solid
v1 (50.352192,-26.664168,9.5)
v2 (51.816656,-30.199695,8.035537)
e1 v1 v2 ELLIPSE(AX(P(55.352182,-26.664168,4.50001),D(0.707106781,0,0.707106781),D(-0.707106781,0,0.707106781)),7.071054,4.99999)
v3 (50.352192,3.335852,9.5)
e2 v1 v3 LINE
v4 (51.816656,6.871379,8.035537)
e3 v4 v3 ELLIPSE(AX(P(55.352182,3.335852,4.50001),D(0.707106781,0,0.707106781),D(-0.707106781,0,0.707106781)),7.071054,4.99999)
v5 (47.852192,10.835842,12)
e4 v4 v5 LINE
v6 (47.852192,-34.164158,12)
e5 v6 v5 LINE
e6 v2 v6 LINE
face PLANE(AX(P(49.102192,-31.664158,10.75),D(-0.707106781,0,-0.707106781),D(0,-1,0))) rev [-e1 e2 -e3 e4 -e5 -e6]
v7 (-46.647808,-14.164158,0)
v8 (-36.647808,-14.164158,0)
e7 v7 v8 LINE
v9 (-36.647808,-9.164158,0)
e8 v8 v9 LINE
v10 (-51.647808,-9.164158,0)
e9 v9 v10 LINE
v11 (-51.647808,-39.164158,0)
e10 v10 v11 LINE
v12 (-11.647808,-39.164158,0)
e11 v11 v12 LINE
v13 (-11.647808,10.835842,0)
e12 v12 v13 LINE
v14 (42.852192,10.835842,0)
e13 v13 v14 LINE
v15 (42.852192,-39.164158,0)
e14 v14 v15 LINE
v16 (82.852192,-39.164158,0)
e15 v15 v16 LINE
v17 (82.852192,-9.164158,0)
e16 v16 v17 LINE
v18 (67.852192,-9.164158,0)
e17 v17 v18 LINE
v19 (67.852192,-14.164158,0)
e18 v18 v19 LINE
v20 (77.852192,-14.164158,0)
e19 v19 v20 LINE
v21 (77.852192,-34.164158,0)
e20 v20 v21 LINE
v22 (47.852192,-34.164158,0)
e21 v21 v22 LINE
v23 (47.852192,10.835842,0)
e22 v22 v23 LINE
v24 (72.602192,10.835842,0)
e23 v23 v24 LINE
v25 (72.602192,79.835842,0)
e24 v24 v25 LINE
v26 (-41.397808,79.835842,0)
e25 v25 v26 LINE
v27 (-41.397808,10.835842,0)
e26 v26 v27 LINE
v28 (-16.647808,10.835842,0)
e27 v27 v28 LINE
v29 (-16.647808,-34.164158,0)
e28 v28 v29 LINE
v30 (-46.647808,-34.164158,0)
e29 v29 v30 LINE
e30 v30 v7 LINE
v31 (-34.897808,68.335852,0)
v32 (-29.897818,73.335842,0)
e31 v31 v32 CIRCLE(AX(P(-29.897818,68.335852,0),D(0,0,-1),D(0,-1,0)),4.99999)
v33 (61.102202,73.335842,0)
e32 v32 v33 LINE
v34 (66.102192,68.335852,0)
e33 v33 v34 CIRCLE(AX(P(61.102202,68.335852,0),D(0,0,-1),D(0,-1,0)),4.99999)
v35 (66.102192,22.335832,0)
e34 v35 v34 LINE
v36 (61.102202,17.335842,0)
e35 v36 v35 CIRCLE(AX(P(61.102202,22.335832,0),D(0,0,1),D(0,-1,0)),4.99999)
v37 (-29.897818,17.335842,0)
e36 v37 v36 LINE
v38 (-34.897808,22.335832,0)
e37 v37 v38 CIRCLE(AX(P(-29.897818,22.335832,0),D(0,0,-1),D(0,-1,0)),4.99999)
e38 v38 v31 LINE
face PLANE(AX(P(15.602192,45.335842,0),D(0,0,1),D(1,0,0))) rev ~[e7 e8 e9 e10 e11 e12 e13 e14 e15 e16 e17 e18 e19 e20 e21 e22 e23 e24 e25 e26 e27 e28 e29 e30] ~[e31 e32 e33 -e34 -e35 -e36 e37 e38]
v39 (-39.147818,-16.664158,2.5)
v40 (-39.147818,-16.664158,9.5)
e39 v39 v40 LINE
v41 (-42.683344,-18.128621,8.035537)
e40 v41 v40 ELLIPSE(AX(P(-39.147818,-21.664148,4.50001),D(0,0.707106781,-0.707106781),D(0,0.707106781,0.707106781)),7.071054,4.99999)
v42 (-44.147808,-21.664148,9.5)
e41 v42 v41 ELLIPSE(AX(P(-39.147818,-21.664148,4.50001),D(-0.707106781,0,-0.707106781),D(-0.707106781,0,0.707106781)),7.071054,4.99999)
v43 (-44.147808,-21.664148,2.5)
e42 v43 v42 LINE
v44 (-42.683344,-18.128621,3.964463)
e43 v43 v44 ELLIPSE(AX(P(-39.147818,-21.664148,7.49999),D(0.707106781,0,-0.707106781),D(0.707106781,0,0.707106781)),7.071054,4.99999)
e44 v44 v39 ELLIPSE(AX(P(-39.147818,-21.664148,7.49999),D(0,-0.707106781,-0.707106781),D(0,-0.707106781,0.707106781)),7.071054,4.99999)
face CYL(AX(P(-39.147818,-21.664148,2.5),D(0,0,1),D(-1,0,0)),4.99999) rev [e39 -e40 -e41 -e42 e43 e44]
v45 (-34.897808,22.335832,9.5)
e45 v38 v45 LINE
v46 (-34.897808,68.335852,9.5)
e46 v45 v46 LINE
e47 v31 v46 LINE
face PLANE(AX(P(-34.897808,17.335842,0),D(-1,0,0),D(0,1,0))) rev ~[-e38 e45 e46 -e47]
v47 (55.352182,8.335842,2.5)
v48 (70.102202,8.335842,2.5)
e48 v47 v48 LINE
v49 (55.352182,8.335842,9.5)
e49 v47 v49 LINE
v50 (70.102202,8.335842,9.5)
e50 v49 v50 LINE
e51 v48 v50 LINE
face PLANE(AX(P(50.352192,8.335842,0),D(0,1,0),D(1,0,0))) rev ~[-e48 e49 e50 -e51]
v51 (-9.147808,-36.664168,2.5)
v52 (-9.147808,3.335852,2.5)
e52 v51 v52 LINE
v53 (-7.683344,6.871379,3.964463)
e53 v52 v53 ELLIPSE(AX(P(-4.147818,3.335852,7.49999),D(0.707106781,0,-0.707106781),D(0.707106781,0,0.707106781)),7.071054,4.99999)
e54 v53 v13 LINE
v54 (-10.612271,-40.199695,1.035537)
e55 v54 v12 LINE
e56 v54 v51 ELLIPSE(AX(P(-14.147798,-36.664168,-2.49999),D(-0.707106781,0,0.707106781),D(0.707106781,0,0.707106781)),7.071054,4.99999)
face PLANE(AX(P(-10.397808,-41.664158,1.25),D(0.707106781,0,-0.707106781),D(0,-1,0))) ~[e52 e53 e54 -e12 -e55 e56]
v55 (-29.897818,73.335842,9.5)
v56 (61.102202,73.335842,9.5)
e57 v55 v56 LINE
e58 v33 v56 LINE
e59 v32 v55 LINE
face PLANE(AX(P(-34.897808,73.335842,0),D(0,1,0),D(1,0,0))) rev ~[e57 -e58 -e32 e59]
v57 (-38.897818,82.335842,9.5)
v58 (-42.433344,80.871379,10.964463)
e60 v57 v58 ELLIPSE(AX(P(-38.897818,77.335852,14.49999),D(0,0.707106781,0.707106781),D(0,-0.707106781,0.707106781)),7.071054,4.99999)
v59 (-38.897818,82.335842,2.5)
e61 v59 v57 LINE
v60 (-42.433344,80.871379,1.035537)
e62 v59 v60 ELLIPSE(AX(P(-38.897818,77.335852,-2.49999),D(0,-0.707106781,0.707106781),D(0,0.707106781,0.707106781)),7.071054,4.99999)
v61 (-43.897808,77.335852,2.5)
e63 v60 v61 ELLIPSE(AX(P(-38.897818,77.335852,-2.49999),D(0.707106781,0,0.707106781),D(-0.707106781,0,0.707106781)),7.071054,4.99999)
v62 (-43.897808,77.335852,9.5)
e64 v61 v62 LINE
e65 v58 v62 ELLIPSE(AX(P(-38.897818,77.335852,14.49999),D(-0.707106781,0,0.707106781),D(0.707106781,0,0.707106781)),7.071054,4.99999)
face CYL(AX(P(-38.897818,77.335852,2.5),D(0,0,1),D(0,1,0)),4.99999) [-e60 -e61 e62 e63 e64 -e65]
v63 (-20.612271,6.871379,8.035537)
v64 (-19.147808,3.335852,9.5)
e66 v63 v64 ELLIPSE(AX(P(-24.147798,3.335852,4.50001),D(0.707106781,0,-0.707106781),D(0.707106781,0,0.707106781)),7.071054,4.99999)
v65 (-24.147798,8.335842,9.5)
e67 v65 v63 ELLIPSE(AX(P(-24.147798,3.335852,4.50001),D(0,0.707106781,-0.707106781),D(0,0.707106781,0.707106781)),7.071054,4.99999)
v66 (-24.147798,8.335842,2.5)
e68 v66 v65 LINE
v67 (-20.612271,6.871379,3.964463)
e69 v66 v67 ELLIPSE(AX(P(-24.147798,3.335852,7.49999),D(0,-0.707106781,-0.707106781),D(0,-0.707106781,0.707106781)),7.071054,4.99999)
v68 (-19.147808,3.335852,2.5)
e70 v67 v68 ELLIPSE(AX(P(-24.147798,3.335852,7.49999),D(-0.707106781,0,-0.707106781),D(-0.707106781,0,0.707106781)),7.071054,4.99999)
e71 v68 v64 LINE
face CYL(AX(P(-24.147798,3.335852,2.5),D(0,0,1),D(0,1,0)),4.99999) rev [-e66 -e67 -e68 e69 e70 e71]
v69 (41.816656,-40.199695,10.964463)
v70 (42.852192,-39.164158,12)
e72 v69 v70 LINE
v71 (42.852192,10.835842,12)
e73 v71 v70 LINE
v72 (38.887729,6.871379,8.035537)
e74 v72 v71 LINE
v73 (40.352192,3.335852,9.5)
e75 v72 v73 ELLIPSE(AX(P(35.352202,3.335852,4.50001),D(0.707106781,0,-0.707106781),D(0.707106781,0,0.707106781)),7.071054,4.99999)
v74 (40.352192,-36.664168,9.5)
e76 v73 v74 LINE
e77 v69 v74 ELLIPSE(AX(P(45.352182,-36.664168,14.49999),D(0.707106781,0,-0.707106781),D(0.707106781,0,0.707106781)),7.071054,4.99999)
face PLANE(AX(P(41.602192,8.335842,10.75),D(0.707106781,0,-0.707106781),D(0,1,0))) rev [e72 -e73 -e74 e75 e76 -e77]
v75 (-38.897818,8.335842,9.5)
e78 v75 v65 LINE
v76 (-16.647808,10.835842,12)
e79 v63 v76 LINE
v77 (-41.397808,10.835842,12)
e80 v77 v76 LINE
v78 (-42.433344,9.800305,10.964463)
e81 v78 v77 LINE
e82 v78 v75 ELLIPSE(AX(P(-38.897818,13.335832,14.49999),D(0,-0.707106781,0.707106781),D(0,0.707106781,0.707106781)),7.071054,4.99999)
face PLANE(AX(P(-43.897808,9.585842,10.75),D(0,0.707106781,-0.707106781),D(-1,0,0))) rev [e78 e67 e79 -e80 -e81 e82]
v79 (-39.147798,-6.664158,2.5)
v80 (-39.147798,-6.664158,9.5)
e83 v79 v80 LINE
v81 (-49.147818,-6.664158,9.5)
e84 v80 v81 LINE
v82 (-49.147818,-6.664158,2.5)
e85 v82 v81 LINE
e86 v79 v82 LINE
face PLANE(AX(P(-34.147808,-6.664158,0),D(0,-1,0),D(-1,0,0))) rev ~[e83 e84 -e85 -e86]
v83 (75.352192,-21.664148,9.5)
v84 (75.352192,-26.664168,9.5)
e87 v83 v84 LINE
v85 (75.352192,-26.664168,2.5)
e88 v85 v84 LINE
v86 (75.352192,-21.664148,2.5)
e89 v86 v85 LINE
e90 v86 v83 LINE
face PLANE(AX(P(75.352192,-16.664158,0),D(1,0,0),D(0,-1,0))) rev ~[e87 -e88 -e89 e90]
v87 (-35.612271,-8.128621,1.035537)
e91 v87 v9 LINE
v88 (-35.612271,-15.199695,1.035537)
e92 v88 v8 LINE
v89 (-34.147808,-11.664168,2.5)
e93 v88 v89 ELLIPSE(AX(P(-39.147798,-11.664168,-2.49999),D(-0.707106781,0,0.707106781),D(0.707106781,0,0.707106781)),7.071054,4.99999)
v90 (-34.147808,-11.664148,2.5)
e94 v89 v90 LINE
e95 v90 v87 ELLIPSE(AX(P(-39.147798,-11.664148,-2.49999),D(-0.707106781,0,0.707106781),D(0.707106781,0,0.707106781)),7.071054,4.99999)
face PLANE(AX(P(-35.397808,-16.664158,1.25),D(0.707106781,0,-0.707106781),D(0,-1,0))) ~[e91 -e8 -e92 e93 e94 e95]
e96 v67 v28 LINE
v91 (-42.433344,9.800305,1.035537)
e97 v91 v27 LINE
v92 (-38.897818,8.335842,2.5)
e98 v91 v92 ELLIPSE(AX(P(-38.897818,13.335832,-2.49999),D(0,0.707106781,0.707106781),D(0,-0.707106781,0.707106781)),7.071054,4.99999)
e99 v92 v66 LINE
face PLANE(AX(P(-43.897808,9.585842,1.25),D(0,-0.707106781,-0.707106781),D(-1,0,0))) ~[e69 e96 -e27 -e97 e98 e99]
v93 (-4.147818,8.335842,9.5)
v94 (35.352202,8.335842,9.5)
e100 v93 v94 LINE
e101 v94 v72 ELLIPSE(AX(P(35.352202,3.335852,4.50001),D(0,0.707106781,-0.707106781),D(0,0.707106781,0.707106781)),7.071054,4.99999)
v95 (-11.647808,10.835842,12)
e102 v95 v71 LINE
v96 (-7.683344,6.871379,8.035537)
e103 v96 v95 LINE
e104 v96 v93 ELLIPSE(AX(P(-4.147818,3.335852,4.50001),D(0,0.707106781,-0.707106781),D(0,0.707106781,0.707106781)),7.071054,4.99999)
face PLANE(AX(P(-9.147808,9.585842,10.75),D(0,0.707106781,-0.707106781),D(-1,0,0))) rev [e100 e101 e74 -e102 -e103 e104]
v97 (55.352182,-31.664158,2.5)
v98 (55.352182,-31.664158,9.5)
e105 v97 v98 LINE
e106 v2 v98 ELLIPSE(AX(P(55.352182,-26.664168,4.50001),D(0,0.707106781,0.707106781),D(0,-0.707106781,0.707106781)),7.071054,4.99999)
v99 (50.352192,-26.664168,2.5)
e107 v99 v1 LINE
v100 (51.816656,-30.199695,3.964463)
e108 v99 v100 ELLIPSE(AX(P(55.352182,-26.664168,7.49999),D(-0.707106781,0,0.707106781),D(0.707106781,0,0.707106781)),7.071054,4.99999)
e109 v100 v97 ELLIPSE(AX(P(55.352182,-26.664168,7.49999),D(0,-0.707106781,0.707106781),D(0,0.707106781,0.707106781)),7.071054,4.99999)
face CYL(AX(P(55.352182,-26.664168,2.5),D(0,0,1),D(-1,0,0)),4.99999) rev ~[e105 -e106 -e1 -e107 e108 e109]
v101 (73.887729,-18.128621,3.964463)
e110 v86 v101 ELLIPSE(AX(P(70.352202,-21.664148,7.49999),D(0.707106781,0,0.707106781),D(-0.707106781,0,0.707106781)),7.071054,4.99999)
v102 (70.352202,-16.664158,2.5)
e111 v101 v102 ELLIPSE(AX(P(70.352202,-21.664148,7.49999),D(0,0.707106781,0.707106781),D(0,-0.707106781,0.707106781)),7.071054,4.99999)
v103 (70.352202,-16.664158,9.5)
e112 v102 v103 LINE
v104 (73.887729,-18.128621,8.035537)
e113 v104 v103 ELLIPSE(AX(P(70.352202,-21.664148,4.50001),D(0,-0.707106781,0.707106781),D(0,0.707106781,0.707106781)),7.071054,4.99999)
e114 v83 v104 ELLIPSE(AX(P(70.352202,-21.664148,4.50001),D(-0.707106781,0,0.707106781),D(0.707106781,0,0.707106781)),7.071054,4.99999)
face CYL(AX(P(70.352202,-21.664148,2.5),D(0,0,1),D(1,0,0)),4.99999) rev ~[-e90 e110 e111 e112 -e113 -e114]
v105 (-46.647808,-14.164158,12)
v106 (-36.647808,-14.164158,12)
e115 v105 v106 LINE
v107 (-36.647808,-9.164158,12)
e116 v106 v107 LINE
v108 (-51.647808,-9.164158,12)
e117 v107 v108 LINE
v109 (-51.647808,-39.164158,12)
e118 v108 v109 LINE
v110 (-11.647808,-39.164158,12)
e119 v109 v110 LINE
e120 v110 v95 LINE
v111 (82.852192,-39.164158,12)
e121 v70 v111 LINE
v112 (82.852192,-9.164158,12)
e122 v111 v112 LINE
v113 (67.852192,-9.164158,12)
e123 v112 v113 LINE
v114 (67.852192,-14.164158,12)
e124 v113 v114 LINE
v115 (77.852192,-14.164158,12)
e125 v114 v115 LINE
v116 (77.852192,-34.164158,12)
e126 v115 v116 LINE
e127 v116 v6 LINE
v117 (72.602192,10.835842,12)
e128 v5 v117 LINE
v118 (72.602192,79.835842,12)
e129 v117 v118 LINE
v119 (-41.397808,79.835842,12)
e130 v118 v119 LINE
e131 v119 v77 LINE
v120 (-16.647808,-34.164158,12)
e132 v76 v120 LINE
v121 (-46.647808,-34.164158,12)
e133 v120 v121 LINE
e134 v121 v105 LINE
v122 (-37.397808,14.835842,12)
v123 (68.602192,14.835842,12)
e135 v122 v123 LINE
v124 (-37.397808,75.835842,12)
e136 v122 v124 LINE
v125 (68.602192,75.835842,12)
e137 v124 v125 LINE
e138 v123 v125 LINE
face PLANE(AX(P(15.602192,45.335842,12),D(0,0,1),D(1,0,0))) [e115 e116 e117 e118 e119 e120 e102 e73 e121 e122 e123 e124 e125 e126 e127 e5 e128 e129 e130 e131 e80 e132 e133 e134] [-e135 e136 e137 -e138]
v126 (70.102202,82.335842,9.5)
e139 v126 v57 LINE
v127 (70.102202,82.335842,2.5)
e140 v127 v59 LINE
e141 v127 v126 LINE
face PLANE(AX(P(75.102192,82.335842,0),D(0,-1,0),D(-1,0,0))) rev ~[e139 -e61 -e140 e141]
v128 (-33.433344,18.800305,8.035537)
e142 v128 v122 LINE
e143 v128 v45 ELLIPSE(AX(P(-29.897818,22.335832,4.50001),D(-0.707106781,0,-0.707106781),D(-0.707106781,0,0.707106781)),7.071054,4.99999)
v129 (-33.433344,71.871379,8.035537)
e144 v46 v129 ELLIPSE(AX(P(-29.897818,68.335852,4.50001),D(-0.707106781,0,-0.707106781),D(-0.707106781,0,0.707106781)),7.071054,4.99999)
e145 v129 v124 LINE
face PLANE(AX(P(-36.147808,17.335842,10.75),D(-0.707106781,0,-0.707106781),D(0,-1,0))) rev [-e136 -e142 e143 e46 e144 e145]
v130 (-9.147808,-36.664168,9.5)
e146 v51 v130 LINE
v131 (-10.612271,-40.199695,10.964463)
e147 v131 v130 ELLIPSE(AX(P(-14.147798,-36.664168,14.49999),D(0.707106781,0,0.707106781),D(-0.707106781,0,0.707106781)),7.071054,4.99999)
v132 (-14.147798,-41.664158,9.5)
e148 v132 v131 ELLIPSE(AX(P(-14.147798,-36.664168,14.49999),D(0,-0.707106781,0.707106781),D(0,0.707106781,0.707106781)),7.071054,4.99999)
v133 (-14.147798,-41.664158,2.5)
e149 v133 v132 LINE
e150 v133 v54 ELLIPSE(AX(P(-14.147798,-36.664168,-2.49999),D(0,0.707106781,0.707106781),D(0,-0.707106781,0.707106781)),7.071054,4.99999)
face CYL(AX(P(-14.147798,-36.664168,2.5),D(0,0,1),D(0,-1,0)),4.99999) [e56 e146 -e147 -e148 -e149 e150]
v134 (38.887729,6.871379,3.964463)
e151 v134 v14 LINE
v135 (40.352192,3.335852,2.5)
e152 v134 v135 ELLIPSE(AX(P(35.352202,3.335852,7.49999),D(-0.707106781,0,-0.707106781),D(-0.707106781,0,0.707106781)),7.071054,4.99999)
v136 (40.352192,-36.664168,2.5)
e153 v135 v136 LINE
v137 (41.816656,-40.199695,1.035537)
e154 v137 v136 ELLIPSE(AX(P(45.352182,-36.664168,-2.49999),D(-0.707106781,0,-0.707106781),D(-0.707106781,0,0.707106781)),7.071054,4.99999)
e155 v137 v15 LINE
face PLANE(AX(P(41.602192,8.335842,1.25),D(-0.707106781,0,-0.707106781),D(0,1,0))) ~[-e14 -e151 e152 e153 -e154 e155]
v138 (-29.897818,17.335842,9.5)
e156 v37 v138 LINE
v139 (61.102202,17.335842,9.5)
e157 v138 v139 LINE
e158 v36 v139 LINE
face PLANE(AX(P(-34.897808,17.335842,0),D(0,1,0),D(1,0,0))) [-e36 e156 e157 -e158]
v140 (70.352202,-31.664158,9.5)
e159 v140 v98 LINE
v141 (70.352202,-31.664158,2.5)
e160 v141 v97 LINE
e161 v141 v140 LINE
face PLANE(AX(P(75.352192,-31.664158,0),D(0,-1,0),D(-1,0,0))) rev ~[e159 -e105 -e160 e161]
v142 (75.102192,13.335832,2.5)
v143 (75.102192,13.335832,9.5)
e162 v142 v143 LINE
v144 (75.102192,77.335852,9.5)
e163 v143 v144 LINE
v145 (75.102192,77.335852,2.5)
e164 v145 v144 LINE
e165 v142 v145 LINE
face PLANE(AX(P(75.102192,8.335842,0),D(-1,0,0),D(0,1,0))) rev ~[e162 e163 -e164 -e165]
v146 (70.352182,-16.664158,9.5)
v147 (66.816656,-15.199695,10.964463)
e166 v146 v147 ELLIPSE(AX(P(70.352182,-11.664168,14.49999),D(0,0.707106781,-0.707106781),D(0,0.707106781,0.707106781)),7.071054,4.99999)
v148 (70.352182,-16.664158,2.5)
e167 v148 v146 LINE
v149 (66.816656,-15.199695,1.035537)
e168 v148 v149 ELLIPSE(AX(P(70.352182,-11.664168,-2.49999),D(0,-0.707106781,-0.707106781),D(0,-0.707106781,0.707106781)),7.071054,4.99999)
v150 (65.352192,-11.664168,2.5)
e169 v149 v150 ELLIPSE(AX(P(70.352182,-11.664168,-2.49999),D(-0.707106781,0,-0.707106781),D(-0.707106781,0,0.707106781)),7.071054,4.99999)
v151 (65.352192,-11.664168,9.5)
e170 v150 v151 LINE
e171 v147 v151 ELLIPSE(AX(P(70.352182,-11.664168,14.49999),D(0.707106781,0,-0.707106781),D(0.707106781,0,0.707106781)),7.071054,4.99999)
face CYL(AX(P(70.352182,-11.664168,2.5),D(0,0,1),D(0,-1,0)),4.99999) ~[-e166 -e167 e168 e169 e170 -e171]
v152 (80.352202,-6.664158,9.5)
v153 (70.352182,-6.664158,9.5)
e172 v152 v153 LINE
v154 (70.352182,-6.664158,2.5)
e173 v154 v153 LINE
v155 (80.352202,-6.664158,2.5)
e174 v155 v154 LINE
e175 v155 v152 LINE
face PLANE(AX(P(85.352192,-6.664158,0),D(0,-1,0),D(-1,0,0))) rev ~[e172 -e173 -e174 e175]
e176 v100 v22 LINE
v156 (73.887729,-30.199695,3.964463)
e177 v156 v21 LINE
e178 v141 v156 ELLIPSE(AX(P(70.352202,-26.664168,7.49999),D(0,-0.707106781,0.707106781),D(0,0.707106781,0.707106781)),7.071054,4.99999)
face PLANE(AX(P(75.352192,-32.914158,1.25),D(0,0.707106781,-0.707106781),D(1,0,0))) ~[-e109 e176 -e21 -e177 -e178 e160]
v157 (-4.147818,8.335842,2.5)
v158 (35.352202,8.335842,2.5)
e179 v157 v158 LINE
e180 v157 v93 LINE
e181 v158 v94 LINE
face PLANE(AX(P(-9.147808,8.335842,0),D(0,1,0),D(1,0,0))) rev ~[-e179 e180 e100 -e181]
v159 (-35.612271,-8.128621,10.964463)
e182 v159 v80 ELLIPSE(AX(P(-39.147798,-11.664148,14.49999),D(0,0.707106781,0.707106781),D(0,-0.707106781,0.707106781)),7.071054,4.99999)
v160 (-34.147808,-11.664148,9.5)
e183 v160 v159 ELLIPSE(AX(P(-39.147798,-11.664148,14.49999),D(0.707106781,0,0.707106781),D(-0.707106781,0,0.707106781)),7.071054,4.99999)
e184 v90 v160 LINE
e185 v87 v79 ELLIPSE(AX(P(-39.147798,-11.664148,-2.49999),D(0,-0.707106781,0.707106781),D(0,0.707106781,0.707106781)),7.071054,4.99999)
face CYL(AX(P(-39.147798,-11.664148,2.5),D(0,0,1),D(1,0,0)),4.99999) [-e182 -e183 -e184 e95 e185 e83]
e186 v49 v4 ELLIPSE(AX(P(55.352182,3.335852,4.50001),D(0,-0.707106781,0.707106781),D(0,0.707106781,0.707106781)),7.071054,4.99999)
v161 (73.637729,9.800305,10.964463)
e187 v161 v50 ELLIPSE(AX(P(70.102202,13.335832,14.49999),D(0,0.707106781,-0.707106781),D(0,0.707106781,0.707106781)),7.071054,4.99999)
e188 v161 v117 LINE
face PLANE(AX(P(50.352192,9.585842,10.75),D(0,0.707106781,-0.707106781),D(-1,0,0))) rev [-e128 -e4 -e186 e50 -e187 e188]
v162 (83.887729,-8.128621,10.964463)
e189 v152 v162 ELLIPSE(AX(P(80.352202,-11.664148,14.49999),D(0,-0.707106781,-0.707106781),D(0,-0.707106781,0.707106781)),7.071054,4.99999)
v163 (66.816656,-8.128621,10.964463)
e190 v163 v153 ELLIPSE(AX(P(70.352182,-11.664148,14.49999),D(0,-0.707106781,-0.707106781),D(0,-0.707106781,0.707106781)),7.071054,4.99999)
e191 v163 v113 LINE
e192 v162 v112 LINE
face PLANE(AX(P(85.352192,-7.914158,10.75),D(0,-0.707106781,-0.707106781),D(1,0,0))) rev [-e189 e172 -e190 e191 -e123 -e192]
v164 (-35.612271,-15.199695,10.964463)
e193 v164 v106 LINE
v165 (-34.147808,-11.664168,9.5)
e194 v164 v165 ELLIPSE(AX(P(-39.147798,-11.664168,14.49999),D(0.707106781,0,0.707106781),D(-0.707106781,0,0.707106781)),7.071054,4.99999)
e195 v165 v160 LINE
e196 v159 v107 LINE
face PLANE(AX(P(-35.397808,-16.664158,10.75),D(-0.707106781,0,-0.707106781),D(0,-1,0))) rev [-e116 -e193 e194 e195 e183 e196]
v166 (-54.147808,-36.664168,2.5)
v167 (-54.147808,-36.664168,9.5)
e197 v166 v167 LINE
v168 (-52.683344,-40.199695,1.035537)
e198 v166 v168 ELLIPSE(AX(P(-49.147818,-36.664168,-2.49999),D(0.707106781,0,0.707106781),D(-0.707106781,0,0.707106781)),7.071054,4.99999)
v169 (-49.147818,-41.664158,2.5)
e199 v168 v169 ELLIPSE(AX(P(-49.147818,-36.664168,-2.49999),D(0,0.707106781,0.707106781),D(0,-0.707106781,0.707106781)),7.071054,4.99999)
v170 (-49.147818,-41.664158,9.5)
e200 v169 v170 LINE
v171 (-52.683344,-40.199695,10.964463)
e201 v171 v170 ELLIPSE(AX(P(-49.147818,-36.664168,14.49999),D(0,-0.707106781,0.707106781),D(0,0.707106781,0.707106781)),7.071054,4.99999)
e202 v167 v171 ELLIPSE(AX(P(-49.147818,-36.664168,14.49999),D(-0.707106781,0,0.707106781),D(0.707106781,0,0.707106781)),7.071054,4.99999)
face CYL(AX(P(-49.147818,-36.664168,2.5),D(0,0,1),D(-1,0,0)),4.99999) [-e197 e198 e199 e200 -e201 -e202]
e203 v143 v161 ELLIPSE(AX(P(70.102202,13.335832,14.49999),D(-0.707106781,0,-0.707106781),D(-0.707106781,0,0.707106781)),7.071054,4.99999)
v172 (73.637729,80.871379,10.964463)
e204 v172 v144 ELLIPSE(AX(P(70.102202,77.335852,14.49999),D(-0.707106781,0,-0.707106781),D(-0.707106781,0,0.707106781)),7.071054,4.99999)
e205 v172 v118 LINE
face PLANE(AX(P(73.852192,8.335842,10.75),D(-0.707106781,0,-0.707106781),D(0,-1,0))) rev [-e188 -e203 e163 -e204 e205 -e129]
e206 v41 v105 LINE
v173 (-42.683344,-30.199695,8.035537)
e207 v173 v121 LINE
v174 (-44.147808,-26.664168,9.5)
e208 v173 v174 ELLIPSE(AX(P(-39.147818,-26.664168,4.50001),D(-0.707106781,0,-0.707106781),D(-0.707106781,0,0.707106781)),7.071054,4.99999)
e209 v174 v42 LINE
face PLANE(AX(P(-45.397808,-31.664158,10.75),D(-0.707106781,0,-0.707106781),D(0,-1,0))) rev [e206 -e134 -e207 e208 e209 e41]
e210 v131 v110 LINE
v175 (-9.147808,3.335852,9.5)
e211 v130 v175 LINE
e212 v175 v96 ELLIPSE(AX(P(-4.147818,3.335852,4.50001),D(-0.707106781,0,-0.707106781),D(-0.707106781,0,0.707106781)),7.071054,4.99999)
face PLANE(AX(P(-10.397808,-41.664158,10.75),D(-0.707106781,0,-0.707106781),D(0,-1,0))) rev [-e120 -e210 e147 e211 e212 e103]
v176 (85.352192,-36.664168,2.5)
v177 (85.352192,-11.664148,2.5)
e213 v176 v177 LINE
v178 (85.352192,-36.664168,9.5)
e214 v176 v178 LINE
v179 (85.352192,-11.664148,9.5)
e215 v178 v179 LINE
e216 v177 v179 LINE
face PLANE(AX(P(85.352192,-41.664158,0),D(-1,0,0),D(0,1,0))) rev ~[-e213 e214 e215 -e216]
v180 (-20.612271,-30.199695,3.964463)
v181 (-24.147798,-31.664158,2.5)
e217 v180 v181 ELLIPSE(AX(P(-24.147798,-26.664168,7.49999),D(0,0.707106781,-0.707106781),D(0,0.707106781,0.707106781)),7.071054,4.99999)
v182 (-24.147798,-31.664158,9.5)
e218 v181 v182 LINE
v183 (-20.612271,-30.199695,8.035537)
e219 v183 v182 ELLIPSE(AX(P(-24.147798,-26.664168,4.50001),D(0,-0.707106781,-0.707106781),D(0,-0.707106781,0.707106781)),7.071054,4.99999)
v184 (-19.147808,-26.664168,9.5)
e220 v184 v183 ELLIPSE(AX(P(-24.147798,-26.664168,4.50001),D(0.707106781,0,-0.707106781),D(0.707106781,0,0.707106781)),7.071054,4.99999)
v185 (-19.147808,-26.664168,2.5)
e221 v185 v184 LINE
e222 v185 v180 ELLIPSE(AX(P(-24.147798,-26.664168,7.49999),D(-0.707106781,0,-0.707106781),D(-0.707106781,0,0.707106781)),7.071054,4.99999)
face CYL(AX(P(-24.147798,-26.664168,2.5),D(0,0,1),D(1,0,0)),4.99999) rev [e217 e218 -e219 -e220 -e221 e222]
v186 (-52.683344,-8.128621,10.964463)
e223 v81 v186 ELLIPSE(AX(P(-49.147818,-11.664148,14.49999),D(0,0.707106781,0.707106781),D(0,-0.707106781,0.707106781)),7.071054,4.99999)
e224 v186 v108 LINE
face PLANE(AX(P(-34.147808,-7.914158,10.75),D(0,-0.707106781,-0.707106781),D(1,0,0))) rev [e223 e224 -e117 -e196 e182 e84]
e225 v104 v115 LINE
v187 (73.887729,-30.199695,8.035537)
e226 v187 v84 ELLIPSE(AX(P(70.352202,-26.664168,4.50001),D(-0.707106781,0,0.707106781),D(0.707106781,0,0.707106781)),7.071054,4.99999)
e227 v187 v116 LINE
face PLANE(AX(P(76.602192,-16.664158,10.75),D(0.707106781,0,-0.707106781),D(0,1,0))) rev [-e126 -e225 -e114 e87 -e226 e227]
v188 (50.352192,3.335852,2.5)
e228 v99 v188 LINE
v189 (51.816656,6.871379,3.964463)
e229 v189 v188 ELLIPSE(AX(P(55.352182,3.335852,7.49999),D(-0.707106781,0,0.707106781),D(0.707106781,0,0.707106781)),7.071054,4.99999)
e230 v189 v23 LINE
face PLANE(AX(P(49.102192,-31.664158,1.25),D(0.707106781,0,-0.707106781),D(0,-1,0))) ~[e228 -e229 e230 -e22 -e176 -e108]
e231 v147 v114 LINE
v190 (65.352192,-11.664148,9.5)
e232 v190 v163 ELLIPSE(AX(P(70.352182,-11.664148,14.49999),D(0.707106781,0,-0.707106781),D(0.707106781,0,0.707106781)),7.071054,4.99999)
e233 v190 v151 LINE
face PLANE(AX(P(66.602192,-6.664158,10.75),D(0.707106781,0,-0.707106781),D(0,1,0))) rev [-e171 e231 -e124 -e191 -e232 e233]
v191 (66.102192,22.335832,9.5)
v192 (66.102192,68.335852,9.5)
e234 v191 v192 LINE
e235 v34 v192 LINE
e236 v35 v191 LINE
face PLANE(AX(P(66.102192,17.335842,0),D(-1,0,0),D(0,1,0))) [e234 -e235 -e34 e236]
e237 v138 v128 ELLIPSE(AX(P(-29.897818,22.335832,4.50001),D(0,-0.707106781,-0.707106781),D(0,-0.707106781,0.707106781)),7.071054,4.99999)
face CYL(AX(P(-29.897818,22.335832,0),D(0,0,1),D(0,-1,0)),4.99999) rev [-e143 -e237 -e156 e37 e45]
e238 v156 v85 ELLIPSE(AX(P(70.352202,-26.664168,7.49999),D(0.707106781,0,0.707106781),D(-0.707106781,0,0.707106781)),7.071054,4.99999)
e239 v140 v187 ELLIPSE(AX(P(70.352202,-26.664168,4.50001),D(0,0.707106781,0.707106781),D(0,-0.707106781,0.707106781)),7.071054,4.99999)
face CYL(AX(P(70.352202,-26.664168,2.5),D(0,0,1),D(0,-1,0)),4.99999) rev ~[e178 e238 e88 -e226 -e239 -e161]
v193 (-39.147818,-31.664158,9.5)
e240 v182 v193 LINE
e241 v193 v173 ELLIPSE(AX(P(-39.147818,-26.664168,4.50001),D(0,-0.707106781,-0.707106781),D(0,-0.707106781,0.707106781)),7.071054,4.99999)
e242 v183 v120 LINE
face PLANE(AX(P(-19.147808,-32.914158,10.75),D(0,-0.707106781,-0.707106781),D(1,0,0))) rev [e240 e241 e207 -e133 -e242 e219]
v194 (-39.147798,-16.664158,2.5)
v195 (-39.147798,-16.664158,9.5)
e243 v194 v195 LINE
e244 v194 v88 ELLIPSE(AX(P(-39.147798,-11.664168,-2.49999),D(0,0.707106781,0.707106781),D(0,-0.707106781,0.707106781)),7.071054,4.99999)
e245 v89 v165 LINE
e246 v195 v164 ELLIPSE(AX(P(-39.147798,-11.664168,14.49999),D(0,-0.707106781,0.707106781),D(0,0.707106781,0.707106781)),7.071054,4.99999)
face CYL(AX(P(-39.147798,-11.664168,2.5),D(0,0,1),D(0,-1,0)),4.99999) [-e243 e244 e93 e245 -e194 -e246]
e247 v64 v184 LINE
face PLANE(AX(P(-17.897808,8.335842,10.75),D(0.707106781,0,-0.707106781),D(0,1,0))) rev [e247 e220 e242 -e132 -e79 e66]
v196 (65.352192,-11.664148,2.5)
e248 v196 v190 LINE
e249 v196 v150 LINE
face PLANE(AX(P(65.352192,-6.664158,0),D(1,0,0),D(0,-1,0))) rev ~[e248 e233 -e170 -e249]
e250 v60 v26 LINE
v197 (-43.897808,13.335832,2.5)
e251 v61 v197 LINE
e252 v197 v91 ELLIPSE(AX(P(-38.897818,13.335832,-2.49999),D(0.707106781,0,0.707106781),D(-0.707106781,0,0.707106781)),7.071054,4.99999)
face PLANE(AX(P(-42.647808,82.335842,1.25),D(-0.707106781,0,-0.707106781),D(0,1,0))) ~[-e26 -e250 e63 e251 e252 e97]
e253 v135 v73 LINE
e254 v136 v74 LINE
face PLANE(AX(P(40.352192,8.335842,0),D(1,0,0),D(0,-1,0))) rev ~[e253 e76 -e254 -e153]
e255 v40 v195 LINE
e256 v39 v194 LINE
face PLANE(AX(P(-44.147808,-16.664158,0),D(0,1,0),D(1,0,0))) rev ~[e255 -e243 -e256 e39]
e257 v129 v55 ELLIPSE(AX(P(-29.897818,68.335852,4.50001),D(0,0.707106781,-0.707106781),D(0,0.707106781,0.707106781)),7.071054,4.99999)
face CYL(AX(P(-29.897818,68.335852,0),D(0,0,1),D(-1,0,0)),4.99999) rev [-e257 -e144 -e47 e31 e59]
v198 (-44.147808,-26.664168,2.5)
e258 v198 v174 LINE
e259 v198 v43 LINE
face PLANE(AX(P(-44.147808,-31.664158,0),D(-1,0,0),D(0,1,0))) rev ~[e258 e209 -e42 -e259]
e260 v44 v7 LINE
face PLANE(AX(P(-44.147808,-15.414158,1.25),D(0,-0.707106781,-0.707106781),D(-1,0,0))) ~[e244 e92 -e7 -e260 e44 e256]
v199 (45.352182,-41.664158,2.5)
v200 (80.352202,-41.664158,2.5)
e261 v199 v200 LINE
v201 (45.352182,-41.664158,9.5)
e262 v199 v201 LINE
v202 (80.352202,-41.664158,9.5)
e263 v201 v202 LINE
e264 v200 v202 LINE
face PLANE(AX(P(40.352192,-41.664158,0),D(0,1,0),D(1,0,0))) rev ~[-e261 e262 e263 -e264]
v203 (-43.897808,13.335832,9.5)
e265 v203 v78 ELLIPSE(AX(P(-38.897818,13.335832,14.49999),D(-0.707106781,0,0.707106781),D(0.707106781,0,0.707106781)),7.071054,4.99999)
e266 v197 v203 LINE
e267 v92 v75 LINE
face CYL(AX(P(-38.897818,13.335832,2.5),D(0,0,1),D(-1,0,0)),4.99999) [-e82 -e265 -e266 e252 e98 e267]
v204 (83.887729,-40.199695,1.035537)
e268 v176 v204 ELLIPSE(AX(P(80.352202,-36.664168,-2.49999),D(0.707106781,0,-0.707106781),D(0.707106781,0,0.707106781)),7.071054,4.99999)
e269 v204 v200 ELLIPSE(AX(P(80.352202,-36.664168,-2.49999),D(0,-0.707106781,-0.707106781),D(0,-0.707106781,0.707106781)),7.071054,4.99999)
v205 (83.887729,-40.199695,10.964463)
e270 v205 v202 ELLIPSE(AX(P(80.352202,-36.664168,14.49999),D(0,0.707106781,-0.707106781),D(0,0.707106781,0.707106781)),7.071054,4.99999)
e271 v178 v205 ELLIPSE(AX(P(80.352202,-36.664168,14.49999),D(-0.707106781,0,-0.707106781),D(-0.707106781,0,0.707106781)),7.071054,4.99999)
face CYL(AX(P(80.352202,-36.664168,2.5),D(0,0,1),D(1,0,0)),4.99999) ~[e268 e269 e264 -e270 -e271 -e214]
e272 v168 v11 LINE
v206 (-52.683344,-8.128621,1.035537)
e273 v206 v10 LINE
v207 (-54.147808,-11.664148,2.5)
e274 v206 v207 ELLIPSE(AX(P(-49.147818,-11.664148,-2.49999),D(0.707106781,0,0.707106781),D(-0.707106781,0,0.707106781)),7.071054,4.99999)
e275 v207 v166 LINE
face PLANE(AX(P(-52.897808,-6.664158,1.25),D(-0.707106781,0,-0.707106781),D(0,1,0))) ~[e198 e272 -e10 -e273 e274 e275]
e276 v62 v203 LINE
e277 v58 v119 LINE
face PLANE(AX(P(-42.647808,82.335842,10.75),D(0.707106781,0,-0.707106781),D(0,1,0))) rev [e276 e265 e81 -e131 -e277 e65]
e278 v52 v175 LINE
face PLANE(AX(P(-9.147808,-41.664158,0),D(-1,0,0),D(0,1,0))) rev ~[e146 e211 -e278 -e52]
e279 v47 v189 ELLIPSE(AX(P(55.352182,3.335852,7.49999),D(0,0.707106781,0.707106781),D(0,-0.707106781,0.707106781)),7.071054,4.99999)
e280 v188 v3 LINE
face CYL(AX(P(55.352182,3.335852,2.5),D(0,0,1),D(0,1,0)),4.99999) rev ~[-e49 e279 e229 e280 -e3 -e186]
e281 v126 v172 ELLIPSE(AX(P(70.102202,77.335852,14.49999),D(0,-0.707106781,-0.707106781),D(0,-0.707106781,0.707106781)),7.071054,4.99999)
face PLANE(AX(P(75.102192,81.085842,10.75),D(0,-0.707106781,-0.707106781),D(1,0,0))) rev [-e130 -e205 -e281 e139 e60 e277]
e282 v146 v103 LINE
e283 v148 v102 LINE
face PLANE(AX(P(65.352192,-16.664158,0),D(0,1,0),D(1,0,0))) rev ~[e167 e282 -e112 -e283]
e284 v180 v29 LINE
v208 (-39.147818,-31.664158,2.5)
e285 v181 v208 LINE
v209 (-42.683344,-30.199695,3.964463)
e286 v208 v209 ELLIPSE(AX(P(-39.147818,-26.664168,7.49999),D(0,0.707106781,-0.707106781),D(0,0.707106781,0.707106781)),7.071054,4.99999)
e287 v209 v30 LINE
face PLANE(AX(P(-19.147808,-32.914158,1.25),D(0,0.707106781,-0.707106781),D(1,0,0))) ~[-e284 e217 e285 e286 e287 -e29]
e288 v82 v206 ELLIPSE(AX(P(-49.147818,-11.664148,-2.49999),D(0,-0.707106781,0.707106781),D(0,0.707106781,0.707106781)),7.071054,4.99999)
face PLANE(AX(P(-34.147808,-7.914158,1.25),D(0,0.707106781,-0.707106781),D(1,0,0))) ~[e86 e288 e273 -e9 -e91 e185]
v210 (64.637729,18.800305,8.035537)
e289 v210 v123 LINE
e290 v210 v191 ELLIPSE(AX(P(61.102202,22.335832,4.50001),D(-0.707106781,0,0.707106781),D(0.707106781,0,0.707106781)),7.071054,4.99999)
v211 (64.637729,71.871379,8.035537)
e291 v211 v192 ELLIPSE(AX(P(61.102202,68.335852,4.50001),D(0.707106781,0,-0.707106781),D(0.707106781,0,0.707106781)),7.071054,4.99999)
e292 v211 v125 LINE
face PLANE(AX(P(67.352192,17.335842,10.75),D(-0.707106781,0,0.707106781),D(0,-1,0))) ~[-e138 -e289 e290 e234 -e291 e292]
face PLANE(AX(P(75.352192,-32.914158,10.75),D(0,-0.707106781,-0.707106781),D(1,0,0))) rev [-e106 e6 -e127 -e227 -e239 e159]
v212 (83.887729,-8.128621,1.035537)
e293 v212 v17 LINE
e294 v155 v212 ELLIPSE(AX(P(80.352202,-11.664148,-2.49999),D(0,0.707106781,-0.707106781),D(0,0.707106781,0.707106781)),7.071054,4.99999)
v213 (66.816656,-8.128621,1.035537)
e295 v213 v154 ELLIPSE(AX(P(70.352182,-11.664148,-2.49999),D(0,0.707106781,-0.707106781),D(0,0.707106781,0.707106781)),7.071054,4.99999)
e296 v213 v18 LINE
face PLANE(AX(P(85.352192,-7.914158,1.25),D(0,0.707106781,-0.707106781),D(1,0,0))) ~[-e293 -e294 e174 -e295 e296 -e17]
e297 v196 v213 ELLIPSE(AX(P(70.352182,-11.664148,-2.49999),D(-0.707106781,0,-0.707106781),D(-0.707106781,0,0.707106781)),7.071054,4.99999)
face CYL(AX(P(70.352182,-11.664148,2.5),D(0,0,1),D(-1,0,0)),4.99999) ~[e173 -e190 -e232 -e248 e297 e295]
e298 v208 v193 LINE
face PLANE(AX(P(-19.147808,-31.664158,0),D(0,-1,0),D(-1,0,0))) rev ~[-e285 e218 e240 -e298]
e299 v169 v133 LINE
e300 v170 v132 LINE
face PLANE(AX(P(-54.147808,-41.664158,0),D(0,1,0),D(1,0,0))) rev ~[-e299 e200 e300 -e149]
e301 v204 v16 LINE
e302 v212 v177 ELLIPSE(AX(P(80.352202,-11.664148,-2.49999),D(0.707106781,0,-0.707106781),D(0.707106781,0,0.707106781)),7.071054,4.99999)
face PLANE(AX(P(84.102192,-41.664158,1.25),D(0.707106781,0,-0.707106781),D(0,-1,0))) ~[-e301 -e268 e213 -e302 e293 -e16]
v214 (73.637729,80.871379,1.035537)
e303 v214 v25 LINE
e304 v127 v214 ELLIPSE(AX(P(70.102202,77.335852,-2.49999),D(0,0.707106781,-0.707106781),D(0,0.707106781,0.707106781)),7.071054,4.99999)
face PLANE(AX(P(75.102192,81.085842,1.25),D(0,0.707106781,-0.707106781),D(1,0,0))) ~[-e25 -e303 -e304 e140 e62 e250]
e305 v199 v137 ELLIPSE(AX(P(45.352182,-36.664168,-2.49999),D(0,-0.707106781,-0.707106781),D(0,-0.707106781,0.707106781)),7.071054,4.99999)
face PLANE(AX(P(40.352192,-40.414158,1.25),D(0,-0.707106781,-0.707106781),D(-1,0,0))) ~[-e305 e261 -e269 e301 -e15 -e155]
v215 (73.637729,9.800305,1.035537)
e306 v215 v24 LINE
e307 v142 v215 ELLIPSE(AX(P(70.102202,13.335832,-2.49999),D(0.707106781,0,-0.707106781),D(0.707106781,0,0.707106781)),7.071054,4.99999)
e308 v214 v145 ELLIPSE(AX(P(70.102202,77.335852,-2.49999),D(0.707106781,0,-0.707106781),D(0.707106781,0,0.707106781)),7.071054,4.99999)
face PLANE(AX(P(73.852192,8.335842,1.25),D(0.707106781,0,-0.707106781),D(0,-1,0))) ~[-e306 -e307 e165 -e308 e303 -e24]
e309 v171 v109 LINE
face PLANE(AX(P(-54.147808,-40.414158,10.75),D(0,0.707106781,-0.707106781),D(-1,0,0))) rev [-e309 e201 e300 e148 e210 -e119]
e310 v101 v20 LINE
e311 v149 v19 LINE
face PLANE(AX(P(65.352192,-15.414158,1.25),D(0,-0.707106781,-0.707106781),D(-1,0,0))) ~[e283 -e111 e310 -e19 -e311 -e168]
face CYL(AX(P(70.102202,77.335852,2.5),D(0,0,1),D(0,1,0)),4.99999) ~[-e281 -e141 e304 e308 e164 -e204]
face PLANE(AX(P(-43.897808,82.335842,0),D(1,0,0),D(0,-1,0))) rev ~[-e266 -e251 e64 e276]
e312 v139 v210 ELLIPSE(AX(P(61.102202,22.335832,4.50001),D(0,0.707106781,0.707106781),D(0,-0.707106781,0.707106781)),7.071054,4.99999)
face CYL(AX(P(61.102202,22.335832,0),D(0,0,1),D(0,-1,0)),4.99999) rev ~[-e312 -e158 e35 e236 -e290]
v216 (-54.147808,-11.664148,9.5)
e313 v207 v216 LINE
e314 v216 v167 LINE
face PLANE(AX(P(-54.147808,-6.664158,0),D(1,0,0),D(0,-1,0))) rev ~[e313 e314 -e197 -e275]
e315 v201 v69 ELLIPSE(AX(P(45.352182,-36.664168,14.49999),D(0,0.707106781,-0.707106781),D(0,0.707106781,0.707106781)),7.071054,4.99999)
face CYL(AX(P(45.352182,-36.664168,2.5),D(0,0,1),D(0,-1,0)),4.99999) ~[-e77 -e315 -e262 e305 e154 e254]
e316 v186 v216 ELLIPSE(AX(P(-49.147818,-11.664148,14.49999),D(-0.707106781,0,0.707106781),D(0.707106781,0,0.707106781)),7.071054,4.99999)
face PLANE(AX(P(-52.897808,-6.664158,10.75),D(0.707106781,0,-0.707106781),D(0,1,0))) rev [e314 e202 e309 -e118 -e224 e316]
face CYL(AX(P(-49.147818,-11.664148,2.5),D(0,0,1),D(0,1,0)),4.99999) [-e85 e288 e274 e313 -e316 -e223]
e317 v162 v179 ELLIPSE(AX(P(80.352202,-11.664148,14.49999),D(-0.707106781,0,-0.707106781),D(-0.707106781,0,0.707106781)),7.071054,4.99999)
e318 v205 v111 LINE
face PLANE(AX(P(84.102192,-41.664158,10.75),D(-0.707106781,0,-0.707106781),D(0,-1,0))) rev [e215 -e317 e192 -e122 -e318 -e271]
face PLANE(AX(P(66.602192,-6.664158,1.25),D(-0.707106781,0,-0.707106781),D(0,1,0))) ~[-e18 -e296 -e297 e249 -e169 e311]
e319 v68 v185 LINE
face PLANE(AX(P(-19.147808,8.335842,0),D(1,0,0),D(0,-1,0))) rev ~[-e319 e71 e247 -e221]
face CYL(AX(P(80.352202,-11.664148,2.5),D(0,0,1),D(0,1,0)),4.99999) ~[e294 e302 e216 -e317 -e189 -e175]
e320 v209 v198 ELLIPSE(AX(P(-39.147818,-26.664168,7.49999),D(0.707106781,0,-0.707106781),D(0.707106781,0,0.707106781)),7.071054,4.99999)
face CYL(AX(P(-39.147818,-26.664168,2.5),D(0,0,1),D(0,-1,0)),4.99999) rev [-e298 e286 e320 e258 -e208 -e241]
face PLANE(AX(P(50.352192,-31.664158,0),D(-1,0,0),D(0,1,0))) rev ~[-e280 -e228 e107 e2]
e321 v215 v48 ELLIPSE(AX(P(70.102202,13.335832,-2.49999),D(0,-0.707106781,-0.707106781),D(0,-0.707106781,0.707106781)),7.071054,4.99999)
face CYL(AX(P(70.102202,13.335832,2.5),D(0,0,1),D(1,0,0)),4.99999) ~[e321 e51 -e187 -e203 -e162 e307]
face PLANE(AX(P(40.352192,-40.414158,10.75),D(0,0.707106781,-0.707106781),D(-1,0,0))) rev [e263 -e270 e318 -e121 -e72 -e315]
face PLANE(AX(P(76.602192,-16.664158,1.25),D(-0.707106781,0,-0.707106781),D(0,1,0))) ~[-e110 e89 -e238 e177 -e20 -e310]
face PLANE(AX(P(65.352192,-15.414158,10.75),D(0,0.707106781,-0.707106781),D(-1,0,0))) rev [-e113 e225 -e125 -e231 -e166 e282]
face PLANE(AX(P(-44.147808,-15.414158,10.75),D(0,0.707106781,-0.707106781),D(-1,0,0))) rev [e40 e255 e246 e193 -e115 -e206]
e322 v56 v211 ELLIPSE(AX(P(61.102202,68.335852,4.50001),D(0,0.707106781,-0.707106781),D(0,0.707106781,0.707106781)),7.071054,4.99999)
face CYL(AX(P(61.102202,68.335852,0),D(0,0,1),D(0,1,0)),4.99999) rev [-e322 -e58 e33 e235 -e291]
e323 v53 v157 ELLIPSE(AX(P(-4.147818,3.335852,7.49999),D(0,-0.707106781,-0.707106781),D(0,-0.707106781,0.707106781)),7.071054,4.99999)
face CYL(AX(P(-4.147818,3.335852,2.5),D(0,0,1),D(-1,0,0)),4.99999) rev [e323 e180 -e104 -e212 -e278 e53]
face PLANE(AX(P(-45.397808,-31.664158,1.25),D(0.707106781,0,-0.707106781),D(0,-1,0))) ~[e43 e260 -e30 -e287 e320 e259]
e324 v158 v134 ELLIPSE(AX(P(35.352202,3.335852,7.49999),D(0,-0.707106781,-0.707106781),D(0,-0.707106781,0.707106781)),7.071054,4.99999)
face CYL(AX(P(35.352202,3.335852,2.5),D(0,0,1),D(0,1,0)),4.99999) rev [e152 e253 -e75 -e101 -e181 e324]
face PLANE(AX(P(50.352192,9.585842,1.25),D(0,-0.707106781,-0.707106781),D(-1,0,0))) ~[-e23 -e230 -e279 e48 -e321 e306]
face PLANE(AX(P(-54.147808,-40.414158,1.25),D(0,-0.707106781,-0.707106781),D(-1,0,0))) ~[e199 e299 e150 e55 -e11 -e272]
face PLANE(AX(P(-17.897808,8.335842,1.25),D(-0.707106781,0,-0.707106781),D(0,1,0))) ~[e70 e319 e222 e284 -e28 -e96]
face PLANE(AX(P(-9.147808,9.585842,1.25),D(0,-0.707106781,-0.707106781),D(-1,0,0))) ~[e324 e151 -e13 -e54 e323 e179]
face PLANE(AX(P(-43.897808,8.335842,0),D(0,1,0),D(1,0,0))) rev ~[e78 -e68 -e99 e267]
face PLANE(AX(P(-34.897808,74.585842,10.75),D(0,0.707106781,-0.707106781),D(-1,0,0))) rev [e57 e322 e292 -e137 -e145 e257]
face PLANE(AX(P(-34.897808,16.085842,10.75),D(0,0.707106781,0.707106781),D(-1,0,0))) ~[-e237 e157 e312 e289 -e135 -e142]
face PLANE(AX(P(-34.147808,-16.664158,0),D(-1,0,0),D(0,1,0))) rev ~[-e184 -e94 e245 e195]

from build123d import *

# Parameters (mm, degrees)
F0_W     = 101
F0_H     = 56
F1_DEPTH = 12
F2_SIZE  = 2.5
F3_R     = 4.99999


# Not quite as in the source:
# - a fillet or chamfer is up to 0.001 mm smaller than in the source, because OpenCascade refuses the exact size


with BuildPart() as f1:
    # F0 (on Top) → F1 (new body)
    with BuildSketch(Plane.XY):
        Polygon((75.1021924019, 82.3358418196), (-43.8978075981, 82.3358418196), (-43.8978075981, 8.3358418196), (-19.1478075981, 8.3358418196), (-9.1478075981, 8.3358418196), (15.6021924019, 8.3358418196), (40.3521924019, 8.3358418196), (50.3521924019, 8.3358418196), (75.1021924019, 8.3358418196), align=None)
        with Locations((15.6021924019, 45.3358418196)):
            Rectangle(F0_W, F0_H, mode=Mode.SUBTRACT)
        Polygon((-9.1478075981, 8.3358418196), (-19.1478075981, 8.3358418196), (-19.1478075981, -31.6641581804), (-44.1478075981, -31.6641581804), (-44.1478075981, -16.6641581804), (-34.1478075981, -16.6641581804), (-34.1478075981, -6.6641581804), (-44.1478075981, -6.6641581804), (-54.1478075981, -6.6641581804), (-54.1478075981, -41.6641581804), (-9.1478075981, -41.6641581804), align=None)
        Polygon((50.3521924019, -31.6641581804), (50.3521924019, 8.3358418196), (40.3521924019, 8.3358418196), (40.3521924019, -41.6641581804), (85.3521924019, -41.6641581804), (85.3521924019, -6.6641581804), (75.3521924019, -6.6641581804), (65.3521924019, -6.6641581804), (65.3521924019, -16.6641581804), (75.3521924019, -16.6641581804), (75.3521924019, -31.6641581804), align=None)
    extrude(amount=F1_DEPTH)

    # F2
    f2_edges = [f1.edges().sort_by_distance(p)[0] for p in [
        (-43.897808, 45.335842, 0),
        (15.602192, 82.335842, 0),
        (75.102192, 45.335842, 0),
        (62.727192, 8.335842, 0),
        (50.352192, -11.664158, 0),
        (62.852192, -31.664158, 0),
        (75.352192, -24.164158, 0),
        (70.352192, -16.664158, 0),
        (65.352192, -11.664158, 0),
        (75.352192, -6.664158, 0),
        (85.352192, -24.164158, 0),
        (62.852192, -41.664158, 0),
        (-31.522808, 8.335842, 0),
        (40.352192, -16.664158, 0),
        (-9.147808, -16.664158, 0),
        (-31.647808, -41.664158, 0),
        (-54.147808, -24.164158, 0),
        (-44.147808, -6.664158, 0),
        (-31.647808, -31.664158, 0),
        (-19.147808, -11.664158, 0),
        (-31.522808, 8.335842, 12),
        (62.727192, 8.335842, 12),
        (15.602192, 82.335842, 12),
        (-43.897808, 45.335842, 12),
        (-19.147808, -11.664158, 12),
        (-31.647808, -31.664158, 12),
        (-44.147808, -24.164158, 12),
        (-39.147808, -16.664158, 12),
        (-34.147808, -11.664158, 12),
        (-44.147808, -6.664158, 12),
        (-54.147808, -24.164158, 12),
        (-31.647808, -41.664158, 12),
        (-9.147808, -16.664158, 12),
        (15.602192, 8.335842, 12),
        (40.352192, -16.664158, 12),
        (62.852192, -41.664158, 12),
        (85.352192, -24.164158, 12),
        (75.352192, -6.664158, 12),
        (65.352192, -11.664158, 12),
        (70.352192, -16.664158, 12),
        (75.352192, -24.164158, 12),
        (62.852192, -31.664158, 12),
        (50.352192, -11.664158, 12),
        (75.102192, 45.335842, 12),
        (15.602192, 17.335842, 12),
        (-34.897808, 45.335842, 12),
        (15.602192, 73.335842, 12),
        (66.102192, 45.335842, 12),
        (-39.147808, -16.664158, 0),
        (-44.147808, -24.164158, 0),
        (-34.147808, -11.664158, 0),
        (15.602192, 8.335842, 0),
    ]]
    chamfer(f2_edges, length=F2_SIZE)

    # F3 (radius 5 in the source; OpenCascade refuses exactly that, so slightly less here)
    f3_edges = [f1.edges().sort_by_distance(p)[0] for p in [
        (-34.897808, 73.335842, 4.75),
        (-34.897808, 17.335842, 4.75),
        (66.102192, 17.335842, 4.75),
        (66.102192, 73.335842, 4.75),
        (75.102192, 8.335842, 6),
        (-43.897808, 8.335842, 6),
        (-43.897808, 82.335842, 6),
        (75.102192, 82.335842, 6),
        (-19.147808, 8.335842, 6),
        (-9.147808, 8.335842, 6),
        (40.352192, 8.335842, 6),
        (50.352192, 8.335842, 6),
        (-9.147808, -41.664158, 6),
        (-54.147808, -41.664158, 6),
        (-54.147808, -6.664158, 6),
        (-34.147808, -6.664158, 6),
        (-34.147808, -16.664158, 6),
        (-44.147808, -16.664158, 6),
        (-44.147808, -31.664158, 6),
        (-19.147808, -31.664158, 6),
        (40.352192, -41.664158, 6),
        (85.352192, -41.664158, 6),
        (85.352192, -6.664158, 6),
        (65.352192, -6.664158, 6),
        (65.352192, -16.664158, 6),
        (75.352192, -16.664158, 6),
        (50.352192, -31.664158, 6),
        (75.352192, -31.664158, 6),
    ]]
    fillet(f3_edges, radius=F3_R)


solid = f1.part
